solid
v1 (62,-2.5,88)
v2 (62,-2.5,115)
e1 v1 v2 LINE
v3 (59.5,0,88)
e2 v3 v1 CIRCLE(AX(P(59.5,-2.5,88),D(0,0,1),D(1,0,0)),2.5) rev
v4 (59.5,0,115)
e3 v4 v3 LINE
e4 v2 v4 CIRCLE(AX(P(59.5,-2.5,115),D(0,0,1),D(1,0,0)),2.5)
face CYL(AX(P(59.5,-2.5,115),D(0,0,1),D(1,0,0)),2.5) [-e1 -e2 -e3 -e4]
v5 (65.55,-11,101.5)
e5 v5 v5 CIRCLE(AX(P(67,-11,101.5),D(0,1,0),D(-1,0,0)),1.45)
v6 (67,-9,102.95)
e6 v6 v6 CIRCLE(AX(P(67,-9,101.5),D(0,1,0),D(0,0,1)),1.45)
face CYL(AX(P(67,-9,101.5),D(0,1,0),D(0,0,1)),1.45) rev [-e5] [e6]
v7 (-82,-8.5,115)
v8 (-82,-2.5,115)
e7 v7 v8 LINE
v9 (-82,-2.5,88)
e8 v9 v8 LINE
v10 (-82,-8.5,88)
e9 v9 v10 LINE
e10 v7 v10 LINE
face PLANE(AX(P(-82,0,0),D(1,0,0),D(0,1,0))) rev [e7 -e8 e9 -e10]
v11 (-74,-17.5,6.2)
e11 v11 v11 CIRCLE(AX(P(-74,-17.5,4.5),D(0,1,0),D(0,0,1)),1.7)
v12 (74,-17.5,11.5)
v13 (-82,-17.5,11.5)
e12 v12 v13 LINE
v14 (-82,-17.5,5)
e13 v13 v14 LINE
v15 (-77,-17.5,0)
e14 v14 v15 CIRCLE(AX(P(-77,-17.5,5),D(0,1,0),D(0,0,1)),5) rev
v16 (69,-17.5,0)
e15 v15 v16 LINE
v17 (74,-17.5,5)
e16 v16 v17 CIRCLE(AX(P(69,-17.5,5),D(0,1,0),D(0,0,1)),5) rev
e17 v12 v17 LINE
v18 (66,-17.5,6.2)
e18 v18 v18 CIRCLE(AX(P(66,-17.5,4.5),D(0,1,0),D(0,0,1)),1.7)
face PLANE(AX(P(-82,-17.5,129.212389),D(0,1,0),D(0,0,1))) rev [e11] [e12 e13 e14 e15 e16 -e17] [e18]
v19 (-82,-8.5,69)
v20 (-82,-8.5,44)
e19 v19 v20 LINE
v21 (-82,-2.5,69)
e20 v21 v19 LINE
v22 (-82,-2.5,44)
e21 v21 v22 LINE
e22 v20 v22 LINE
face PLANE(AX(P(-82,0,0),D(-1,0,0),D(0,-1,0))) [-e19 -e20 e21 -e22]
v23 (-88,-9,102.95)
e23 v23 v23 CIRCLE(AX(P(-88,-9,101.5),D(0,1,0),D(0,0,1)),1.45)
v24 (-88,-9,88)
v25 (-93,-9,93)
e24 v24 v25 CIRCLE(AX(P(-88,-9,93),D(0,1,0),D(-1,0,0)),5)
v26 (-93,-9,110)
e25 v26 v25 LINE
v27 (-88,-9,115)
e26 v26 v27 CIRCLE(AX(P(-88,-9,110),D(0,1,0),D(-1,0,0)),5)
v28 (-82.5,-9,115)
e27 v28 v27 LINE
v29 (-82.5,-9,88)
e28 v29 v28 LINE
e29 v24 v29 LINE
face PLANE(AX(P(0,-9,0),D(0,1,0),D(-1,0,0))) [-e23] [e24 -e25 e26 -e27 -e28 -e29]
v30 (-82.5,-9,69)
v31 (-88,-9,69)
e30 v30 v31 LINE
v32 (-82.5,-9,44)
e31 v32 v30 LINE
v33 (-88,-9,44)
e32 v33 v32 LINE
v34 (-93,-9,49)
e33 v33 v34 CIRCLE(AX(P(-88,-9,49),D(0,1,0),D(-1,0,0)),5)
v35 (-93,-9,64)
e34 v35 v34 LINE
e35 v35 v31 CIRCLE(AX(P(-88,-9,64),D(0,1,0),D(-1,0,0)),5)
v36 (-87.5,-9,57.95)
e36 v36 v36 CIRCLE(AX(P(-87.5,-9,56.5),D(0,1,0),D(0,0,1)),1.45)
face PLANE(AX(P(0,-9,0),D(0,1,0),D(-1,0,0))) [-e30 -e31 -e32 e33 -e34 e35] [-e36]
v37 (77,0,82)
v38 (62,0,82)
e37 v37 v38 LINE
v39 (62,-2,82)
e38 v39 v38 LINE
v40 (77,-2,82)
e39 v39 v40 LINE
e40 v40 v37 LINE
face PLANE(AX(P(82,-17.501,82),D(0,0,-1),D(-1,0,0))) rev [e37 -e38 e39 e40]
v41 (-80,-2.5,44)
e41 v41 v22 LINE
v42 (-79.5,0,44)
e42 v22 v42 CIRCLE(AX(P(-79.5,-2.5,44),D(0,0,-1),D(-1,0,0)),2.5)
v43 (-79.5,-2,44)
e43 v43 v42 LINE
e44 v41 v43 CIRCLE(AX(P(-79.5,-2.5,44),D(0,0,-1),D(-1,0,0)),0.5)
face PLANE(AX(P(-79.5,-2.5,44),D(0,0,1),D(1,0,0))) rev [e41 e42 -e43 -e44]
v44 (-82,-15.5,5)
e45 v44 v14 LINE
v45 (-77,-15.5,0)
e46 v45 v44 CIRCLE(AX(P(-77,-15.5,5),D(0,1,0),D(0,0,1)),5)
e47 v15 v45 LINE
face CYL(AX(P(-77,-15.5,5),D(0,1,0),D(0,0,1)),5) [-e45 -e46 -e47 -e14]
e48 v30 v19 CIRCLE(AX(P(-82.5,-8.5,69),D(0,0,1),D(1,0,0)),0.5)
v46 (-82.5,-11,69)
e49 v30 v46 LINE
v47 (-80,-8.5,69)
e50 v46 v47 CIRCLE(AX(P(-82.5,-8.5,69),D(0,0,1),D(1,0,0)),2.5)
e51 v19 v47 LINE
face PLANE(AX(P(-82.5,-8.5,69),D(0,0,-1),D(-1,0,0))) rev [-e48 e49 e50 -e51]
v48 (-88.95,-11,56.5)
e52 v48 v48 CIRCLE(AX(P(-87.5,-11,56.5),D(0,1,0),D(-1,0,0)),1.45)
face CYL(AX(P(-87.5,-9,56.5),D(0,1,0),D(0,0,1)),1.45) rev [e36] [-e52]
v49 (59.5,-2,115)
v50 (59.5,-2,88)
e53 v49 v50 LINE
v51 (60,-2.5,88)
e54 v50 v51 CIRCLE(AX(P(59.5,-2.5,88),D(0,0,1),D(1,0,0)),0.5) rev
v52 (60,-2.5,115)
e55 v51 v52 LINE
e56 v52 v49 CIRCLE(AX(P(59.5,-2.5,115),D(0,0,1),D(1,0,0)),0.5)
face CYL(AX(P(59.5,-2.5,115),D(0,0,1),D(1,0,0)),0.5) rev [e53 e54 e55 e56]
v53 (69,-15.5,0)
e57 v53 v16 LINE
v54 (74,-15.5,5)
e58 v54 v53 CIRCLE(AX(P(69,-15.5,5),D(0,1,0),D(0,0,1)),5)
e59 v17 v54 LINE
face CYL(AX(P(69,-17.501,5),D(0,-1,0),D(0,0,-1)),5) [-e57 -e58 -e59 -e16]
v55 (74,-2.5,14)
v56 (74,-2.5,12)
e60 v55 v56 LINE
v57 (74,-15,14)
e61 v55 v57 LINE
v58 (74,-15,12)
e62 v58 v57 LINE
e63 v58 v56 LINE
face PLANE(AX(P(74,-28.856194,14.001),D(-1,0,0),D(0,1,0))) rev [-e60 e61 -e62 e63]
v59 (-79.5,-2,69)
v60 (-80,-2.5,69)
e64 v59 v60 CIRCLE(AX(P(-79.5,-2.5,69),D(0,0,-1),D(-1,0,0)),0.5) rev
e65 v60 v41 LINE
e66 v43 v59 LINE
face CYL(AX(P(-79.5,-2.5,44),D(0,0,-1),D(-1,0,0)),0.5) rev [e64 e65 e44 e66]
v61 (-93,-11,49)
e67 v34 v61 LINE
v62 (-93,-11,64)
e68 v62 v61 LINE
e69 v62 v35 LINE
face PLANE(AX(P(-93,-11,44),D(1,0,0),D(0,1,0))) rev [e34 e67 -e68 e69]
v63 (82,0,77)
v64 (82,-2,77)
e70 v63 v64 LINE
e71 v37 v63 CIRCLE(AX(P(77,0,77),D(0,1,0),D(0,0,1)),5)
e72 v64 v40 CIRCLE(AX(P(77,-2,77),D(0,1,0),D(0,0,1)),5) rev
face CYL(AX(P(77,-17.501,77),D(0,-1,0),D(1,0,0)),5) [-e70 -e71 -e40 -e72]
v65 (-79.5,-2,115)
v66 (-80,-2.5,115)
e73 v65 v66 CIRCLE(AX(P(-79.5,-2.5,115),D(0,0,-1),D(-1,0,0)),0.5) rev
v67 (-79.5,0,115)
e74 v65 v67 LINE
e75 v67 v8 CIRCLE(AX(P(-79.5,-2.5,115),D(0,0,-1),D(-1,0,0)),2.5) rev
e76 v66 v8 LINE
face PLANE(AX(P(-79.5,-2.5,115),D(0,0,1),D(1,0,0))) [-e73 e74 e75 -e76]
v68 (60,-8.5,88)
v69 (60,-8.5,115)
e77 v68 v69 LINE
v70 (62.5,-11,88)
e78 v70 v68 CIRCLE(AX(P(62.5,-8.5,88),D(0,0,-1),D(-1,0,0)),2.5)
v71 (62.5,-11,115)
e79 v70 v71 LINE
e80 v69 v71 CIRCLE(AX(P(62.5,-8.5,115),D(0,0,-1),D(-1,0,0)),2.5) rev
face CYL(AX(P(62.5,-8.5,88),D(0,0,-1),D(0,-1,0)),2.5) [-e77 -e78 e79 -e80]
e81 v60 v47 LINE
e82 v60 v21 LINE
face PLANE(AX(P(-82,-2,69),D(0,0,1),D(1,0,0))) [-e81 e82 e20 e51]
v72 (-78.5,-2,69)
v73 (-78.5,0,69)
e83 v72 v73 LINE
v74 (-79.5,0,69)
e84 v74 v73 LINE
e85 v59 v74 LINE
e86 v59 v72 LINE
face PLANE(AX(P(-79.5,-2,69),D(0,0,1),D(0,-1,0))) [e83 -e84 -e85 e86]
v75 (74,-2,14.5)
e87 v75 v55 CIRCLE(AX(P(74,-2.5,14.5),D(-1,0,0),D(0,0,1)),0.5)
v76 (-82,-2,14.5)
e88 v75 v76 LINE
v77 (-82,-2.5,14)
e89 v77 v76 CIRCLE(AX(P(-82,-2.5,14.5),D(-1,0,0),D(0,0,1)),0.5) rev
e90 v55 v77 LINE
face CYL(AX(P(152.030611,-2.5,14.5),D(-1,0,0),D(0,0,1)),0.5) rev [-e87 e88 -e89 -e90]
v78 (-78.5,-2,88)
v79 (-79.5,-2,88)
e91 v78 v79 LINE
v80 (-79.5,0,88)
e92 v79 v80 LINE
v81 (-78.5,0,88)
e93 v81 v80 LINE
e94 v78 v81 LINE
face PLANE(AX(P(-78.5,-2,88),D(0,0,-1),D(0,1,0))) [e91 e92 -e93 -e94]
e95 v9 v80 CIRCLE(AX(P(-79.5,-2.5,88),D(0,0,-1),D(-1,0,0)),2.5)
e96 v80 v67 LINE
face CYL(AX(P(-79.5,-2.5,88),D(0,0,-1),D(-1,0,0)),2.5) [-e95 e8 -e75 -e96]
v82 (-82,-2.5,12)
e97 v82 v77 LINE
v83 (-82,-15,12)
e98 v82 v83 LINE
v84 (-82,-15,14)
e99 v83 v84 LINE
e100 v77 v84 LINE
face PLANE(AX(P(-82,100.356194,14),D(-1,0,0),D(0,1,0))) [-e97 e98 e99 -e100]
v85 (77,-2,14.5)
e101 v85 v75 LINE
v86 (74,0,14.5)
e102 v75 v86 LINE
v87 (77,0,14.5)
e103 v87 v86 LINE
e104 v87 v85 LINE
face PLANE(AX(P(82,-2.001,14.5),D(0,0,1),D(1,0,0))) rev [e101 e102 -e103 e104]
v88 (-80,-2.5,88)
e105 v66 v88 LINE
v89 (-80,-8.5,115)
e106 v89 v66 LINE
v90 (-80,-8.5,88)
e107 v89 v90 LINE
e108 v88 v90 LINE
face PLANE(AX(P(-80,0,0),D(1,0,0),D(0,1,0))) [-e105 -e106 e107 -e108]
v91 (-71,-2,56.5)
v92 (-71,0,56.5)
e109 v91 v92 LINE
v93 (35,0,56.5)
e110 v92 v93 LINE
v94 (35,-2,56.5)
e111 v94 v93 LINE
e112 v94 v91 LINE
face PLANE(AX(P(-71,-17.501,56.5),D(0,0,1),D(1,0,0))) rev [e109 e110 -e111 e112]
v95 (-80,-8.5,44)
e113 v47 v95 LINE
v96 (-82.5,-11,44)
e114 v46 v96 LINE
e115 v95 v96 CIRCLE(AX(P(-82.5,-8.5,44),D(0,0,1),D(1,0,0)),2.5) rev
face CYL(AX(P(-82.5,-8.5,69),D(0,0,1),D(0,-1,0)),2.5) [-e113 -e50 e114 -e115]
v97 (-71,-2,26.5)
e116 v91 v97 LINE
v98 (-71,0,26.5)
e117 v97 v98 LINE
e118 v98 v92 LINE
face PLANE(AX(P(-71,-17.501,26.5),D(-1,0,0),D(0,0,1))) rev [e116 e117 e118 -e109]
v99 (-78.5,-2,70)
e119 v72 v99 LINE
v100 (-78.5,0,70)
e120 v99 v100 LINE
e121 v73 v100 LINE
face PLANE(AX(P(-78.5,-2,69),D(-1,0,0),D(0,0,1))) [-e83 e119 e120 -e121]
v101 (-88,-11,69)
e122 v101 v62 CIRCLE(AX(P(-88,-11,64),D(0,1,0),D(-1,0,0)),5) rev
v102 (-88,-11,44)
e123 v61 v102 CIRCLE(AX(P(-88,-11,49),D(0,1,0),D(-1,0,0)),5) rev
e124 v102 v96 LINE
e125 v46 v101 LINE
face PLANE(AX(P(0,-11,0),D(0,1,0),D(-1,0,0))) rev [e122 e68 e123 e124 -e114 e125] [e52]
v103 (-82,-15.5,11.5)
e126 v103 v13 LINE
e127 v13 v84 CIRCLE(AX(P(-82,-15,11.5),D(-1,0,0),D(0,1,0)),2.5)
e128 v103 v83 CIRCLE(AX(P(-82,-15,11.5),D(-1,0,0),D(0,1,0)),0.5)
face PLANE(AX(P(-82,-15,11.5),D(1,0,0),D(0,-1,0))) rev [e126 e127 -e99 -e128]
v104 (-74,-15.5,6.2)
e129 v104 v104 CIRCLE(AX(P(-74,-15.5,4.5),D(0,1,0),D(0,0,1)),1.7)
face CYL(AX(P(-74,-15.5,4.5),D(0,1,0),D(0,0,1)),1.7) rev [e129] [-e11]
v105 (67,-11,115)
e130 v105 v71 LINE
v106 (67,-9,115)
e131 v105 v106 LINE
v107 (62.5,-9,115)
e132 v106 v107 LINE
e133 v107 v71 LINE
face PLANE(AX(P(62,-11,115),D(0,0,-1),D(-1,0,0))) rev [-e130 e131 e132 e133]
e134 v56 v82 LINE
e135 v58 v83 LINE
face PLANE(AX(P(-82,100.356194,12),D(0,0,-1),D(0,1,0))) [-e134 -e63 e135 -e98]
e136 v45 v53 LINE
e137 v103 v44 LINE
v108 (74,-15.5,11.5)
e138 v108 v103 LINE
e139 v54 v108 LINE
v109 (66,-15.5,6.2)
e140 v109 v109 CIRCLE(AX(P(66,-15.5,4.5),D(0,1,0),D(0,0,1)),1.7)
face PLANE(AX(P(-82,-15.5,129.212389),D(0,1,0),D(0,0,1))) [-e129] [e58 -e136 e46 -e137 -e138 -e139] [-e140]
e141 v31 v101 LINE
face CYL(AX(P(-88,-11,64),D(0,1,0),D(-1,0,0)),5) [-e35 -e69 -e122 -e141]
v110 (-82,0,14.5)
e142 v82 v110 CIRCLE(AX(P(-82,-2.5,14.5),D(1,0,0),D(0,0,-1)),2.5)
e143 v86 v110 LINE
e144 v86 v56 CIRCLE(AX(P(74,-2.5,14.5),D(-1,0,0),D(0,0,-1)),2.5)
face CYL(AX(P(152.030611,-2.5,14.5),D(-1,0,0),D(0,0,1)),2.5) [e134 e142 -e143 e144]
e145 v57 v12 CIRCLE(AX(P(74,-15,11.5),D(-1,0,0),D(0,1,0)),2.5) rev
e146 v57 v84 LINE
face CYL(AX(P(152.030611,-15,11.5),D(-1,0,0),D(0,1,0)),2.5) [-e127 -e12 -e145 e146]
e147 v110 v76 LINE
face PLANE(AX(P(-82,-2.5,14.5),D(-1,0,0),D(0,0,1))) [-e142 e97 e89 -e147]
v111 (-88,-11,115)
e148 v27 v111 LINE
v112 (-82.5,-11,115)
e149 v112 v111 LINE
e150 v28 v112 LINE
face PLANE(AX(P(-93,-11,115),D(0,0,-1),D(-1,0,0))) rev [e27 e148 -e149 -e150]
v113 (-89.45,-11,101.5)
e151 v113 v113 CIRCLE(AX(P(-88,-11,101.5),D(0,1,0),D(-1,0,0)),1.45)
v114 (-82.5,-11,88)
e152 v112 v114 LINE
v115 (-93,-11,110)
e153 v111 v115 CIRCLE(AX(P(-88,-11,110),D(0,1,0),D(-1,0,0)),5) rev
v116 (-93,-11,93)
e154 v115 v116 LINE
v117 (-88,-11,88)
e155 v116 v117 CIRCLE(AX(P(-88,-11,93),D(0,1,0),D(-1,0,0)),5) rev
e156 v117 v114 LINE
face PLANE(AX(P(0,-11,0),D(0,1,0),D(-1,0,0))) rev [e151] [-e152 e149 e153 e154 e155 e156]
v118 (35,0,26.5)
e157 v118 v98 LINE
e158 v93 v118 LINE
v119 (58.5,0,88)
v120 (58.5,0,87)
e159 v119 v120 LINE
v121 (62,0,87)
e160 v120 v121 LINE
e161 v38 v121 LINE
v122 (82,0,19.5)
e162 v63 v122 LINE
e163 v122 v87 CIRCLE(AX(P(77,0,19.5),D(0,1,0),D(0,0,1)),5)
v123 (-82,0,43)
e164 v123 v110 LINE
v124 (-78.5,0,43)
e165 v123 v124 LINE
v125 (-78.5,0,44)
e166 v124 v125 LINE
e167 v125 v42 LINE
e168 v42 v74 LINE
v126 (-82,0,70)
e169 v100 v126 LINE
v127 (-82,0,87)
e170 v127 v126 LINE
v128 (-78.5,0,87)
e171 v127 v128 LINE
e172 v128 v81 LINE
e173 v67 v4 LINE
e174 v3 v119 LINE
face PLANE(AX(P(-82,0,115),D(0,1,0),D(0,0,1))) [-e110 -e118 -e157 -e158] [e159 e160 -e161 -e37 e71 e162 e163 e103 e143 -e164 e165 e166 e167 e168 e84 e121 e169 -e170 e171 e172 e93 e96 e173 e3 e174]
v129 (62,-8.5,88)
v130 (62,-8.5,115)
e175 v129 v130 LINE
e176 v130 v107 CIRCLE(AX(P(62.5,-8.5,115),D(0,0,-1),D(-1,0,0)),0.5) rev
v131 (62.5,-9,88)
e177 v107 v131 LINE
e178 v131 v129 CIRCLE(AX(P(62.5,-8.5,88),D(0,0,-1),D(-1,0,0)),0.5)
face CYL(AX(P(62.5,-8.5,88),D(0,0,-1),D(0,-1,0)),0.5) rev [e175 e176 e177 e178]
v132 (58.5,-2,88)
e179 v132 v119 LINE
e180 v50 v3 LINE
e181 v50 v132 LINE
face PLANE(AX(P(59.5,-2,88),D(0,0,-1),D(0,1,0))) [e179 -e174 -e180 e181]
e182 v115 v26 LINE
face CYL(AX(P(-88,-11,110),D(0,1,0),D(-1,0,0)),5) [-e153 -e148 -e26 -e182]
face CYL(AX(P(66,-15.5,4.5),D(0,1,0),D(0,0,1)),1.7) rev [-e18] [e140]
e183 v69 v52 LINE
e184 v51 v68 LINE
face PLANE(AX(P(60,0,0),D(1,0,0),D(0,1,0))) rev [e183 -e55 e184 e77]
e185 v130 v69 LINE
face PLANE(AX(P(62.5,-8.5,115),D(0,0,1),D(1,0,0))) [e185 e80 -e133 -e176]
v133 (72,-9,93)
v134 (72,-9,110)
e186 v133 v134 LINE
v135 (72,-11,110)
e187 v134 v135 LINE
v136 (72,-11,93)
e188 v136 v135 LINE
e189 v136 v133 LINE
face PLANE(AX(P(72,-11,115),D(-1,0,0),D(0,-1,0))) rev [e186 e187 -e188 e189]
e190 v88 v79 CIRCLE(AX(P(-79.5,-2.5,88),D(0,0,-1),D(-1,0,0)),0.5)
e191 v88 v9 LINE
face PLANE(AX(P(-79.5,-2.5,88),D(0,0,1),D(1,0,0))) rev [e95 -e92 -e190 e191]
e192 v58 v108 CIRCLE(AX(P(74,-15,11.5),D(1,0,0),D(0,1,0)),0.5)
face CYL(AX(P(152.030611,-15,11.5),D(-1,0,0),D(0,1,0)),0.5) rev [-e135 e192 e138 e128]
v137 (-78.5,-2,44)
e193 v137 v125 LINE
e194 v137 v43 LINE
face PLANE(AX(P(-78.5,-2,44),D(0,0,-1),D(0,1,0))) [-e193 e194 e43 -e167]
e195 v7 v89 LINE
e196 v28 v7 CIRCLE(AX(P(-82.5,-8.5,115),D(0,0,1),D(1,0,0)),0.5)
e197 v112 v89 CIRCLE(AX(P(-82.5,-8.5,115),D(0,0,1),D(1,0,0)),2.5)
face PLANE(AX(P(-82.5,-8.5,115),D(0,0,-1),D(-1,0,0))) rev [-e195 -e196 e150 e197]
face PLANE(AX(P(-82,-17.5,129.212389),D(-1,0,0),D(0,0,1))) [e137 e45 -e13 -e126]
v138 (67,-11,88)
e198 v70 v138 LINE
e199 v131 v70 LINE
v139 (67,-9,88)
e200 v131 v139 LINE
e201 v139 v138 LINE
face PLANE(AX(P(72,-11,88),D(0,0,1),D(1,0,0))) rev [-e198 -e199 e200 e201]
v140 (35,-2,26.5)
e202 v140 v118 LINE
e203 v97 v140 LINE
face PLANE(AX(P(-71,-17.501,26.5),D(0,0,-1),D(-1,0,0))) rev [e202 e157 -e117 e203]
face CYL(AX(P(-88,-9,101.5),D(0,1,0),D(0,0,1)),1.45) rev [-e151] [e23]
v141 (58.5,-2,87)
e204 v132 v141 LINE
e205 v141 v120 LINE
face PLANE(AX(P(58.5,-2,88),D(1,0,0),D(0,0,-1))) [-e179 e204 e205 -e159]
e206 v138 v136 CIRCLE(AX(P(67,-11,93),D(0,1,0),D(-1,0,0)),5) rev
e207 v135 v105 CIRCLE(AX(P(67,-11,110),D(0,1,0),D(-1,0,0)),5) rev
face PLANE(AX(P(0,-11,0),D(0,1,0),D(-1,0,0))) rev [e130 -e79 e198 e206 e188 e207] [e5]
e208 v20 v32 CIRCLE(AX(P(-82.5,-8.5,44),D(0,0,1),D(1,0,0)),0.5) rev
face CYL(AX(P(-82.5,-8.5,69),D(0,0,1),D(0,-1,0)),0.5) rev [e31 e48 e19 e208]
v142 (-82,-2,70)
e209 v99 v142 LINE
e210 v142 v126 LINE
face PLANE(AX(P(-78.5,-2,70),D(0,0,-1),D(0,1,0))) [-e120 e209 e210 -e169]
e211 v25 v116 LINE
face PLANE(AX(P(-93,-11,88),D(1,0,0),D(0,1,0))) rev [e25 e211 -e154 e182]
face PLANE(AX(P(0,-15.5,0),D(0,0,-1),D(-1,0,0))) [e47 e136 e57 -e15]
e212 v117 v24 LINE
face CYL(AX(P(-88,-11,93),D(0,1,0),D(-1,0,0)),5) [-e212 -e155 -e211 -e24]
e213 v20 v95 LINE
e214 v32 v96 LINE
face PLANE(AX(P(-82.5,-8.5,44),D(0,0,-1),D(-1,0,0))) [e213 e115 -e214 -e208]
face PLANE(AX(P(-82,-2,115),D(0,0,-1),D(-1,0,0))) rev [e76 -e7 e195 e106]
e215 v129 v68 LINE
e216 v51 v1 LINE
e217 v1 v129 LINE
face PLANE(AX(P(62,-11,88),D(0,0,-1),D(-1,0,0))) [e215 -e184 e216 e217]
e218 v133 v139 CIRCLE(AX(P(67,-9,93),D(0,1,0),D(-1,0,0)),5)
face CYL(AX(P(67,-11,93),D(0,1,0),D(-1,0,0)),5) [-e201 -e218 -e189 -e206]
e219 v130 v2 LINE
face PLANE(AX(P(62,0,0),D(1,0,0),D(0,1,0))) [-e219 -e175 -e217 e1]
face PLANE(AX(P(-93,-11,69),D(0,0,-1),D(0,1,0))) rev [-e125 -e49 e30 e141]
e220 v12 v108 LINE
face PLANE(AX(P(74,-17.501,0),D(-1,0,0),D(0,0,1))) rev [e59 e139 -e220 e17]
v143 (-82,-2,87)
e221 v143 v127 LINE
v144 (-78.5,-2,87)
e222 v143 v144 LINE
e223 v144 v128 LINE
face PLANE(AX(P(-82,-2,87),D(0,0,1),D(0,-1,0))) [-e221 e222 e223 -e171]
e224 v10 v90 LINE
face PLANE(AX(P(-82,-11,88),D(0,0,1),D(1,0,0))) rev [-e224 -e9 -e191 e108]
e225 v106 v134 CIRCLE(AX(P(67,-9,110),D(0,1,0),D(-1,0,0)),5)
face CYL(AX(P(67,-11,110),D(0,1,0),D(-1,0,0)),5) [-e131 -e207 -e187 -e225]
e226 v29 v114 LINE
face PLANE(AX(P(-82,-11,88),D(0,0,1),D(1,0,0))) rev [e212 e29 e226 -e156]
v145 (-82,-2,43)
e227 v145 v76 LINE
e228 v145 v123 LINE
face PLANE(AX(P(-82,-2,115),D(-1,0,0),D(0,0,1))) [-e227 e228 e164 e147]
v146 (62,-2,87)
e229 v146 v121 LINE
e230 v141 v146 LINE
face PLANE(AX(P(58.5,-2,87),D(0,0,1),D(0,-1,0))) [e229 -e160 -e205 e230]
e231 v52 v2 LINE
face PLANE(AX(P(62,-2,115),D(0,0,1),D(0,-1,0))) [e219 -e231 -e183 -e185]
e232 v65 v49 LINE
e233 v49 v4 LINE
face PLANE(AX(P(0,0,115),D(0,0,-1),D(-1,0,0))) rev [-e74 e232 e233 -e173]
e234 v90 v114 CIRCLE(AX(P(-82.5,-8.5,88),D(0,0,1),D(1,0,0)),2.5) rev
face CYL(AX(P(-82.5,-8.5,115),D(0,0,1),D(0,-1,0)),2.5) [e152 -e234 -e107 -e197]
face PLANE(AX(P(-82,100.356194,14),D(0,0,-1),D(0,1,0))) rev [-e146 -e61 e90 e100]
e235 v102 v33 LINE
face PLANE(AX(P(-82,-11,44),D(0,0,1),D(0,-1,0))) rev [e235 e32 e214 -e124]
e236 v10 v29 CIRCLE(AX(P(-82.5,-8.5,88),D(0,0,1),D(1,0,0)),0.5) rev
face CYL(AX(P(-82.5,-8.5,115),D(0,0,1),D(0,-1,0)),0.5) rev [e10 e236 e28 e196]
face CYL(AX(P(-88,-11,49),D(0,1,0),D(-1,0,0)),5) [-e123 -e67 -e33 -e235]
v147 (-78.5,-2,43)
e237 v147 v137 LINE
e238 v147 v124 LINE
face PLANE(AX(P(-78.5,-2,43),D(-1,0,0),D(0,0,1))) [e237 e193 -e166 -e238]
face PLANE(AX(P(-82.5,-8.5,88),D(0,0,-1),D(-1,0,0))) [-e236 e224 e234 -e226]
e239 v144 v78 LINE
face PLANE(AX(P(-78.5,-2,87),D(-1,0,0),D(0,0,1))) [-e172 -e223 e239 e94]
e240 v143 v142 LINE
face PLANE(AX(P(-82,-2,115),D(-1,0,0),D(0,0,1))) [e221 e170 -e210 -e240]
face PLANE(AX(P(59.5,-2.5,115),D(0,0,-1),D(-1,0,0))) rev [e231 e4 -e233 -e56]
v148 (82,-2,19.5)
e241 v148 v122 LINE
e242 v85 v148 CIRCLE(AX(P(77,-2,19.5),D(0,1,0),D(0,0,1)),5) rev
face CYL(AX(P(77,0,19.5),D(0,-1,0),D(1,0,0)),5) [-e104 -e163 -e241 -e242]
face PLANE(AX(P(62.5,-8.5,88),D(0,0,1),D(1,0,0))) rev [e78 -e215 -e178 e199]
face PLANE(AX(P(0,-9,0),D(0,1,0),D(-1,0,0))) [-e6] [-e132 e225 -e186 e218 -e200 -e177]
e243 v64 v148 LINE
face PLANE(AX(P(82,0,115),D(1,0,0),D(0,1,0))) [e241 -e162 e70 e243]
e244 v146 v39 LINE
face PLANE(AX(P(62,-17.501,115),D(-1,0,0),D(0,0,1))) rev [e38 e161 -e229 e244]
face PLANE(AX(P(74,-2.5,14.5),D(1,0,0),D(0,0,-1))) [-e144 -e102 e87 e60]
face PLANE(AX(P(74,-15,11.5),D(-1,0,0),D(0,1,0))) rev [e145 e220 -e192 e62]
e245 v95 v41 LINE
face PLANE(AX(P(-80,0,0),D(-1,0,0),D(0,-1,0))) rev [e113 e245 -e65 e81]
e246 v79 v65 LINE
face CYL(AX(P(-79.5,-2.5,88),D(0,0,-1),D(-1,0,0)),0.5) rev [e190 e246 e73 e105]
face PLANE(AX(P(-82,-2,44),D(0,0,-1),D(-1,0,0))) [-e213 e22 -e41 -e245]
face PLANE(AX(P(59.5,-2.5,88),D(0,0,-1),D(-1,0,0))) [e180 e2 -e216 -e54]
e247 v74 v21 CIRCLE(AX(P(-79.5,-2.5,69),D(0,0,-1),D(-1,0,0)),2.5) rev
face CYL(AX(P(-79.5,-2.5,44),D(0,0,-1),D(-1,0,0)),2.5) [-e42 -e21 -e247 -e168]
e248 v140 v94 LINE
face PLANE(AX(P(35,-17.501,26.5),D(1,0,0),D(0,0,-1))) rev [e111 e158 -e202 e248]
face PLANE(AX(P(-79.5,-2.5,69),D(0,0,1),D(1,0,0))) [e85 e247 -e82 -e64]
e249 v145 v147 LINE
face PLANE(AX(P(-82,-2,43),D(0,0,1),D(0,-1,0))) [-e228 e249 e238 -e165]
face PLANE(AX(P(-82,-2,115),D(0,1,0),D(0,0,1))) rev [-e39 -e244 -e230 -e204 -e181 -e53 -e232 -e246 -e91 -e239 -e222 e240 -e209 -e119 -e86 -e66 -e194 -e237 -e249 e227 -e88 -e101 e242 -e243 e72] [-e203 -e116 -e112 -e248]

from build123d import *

# Parameters (mm, degrees)
SKETCH_2_W                        = 164
SKETCH_2_H                        = 2
SM_BASE_FLANGE_1_DEPTH            = 115
OTHER_START                       = -82
OTHER_1_DEPTH                     = 164
OTHER_1_2_DEPTH                   = 164
OTHER_1_3_DEPTH                   = 164
OTHER_1_3_2_DEPTH                 = 164
CUT_EXTRUDE_2_REACH               = 143.255
SKETCH_10_W                       = 8
SKETCH_10_H                       = 28.71238898
OTHER_1_4_DEPTH                   = 156
OTHER_1_4_2_DEPTH                 = 156
CUT_EXTRUDE_5_REACH               = 144.321
SKETCH_17_W                       = 20
SKETCH_17_H                       = 33
SM_EDGE_FLANGE_2_STRIP_W          = 9
SM_EDGE_FLANGE_2_STRIP_H          = 2
SM_EDGE_FLANGE_2_STRIP_CUT_DEPTH  = 27
SM_EDGE_FLANGE_2_RELIEF_W         = 10
SM_EDGE_FLANGE_2_RELIEF_H         = 1
SM_EDGE_FLANGE_2_RELIEF_CUT_DEPTH = 2
SM_EDGE_FLANGE_2_DEPTH            = 27
SM_EDGE_FLANGE_4_STRIP_W          = 9
SM_EDGE_FLANGE_4_STRIP_H          = 2
SM_EDGE_FLANGE_4_STRIP_CUT_DEPTH  = 27
SM_EDGE_FLANGE_4_DEPTH            = 27
SM_EDGE_FLANGE_6_STRIP_W          = 9
SM_EDGE_FLANGE_6_STRIP_H          = 2
SM_EDGE_FLANGE_6_STRIP_CUT_DEPTH  = 25
SM_EDGE_FLANGE_6_RELIEF_W         = 10
SM_EDGE_FLANGE_6_RELIEF_H         = 1
SM_EDGE_FLANGE_6_RELIEF_CUT_DEPTH = 2
SM_EDGE_FLANGE_6_DEPTH            = 25
SM_EDGE_FLANGE_8_STRIP_W          = 9
SM_EDGE_FLANGE_8_STRIP_H          = 2
SM_EDGE_FLANGE_8_STRIP_CUT_DEPTH  = 25
SM_EDGE_FLANGE_8_DEPTH            = 25
SM_EDGE_FLANGE_9_STRIP_W          = 9
SM_EDGE_FLANGE_9_STRIP_H          = 2
SM_EDGE_FLANGE_9_STRIP_CUT_DEPTH  = 27
SM_EDGE_FLANGE_9_RELIEF_W         = 10
SM_EDGE_FLANGE_9_RELIEF_H         = 1
SM_EDGE_FLANGE_9_RELIEF_CUT_DEPTH = 2
SM_EDGE_FLANGE_9_DEPTH            = 27
SM_EDGE_FLANGE_10_STRIP_W         = 9
SM_EDGE_FLANGE_10_STRIP_H         = 2
SM_EDGE_FLANGE_10_STRIP_CUT_DEPTH = 27
SM_EDGE_FLANGE_10_DEPTH           = 27
CUT_EXTRUDE_6_REACH               = 150.93
SKETCH_45_W                       = 106
SKETCH_45_H                       = 30
FILLET_1_R                        = 5
HOLE_WIZARD_M3_1_D                = 3.4
HOLE_WIZARD_M2_5_1_D              = 2.9


# Read off the part's stored shape, not the designer's step: ｼﾞｮｸﾞ1, ｱﾝﾌｫｰﾙﾄﾞ1, ﾌｫｰﾙﾄﾞ1
# Sheet-metal steps are written as plain solids
with BuildPart() as part:
    # Sketch 2 → ﾍﾞｰｽ-ﾌﾗﾝｼﾞ1 (new body)
    with BuildSketch(Plane.XY):
        with Locations((0, -1)):
            Rectangle(SKETCH_2_W, SKETCH_2_H)
    extrude(amount=SM_BASE_FLANGE_1_DEPTH)

    # Other 1 outline → Other 1 (cut)
    with BuildSketch(Plane.YZ.offset(OTHER_START)):
        with BuildLine():
            ThreePointArc((0, 14.5), (-0.563508327, 12.91886117), (-2, 12.050510257))
            Line((-2, 12.050510257), (-2, 0))
            Line((-2, 0), (0, 0))
            Line((0, 0), (0, 14.5))
        make_face()
    extrude(amount=OTHER_1_DEPTH, mode=Mode.SUBTRACT)

    # Other 1 2 outline → Other 1 2 (add)
    with BuildSketch(Plane.YZ.offset(OTHER_START)):
        with BuildLine():
            ThreePointArc((-15.5, 11.5), (-15.353553391, 11.853553391), (-15, 12))
            Line((-15, 12), (-2.5, 12))
            ThreePointArc((-2.5, 12), (-2.248727595, 12.012659617), (-2, 12.050510257))
            Line((-2, 12.050510257), (-2, 14.5))
            ThreePointArc((-2, 14.5), (-2.146446609, 14.146446609), (-2.5, 14))
            Line((-2.5, 14), (-15, 14))
            ThreePointArc((-15, 14), (-16.767766953, 13.267766953), (-17.5, 11.5))
            Line((-17.5, 11.5), (-17.5, 0))
            Line((-17.5, 0), (-15.5, 0))
            Line((-15.5, 0), (-15.5, 11.5))
        make_face()
    extrude(amount=OTHER_1_2_DEPTH)

    # Other 1 3 outline → Other 1 3 (cut)
    with BuildSketch(Plane.YZ.offset(OTHER_START)):
        with BuildLine():
            ThreePointArc((-2.5, 12), (-2.248727595, 12.012659617), (-2, 12.050510257))
            Line((-2, 12.050510257), (-2, 14.5))
            ThreePointArc((-2, 14.5), (-2.146446609, 14.146446609), (-2.5, 14))
            Line((-2.5, 14), (-15, 14))
            ThreePointArc((-15, 14), (-16.767766953, 13.267766953), (-17.5, 11.5))
            Line((-17.5, 11.5), (-17.5, 0))
            Line((-17.5, 0), (-15.5, 0))
            Line((-15.5, 0), (-15.5, 11.5))
            ThreePointArc((-15.5, 11.5), (-15.353553391, 11.853553391), (-15, 12))
            Line((-15, 12), (-2.5, 12))
        make_face()
    extrude(amount=OTHER_1_3_DEPTH, mode=Mode.SUBTRACT)

    # Other 1 3 2 outline → Other 1 3 2 (add)
    with BuildSketch(Plane.YZ.offset(OTHER_START)):
        with BuildLine():
            Line((0, -14.21238898), (0, 14.5))
            ThreePointArc((0, 14.5), (-0.563508327, 12.91886117), (-2, 12.050510257))
            Line((-2, 12.050510257), (-2, -14.21238898))
            Line((-2, -14.21238898), (0, -14.21238898))
        make_face()
    extrude(amount=OTHER_1_3_2_DEPTH)

    # ｽｹｯﾁ10 → ｶｯﾄ - 押し出し2 (cut, up to next)
    with BuildSketch(Plane(origin=(0, 0, 0), x_dir=(1, 0, 0), z_dir=(0, 1, 0)), mode=Mode.PRIVATE) as cut_extrude_2_sk1:
        with Locations((78, -0.14380551)):
            Rectangle(SKETCH_10_W, SKETCH_10_H)
    cut_extrude_2_tool1 = extrude(cut_extrude_2_sk1.sketch, amount=-CUT_EXTRUDE_2_REACH, mode=Mode.PRIVATE) & part.part
    add(cut_extrude_2_tool1.solids().sort_by_distance((78, 0, 0.143806))[0], mode=Mode.SUBTRACT)

    # Other 1 4 outline → Other 1 4 (cut)
    with BuildSketch(Plane.YZ.offset(OTHER_START)):
        with BuildLine():
            ThreePointArc((0, 14.5), (-0.563508327, 12.91886117), (-2, 12.050510257))
            Line((-2, 12.050510257), (-2, -14.21238898))
            Line((-2, -14.21238898), (0, -14.21238898))
            Line((0, -14.21238898), (0, 14.5))
        make_face()
    extrude(amount=OTHER_1_4_DEPTH, mode=Mode.SUBTRACT)

    # Other 1 4 2 outline → Other 1 4 2 (add)
    with BuildSketch(Plane.YZ.offset(OTHER_START)):
        with BuildLine():
            ThreePointArc((-15.5, 11.5), (-15.353553391, 11.853553391), (-15, 12))
            Line((-15, 12), (-2.5, 12))
            ThreePointArc((-2.5, 12), (-2.248727595, 12.012659617), (-2, 12.050510257))
            Line((-2, 12.050510257), (-2, 14.5))
            ThreePointArc((-2, 14.5), (-2.146446609, 14.146446609), (-2.5, 14))
            Line((-2.5, 14), (-15, 14))
            ThreePointArc((-15, 14), (-16.767766953, 13.267766953), (-17.5, 11.5))
            Line((-17.5, 11.5), (-17.5, 0))
            Line((-17.5, 0), (-15.5, 0))
            Line((-15.5, 0), (-15.5, 11.5))
        make_face()
    extrude(amount=OTHER_1_4_2_DEPTH)

    # ｽｹｯﾁ17 → ｶｯﾄ - 押し出し5 (cut, up to next)
    with BuildSketch(Plane(origin=(0, 0, 0), x_dir=(1, 0, 0), z_dir=(0, 1, 0)), mode=Mode.PRIVATE) as cut_extrude_5_sk1:
        with Locations((72, -98.5)):
            Rectangle(SKETCH_17_W, SKETCH_17_H)
    cut_extrude_5_tool1 = extrude(cut_extrude_5_sk1.sketch, amount=-CUT_EXTRUDE_5_REACH, mode=Mode.PRIVATE) & part.part
    add(cut_extrude_5_tool1.solids().sort_by_distance((72, 0, 98.5))[0], mode=Mode.SUBTRACT)

    # ｴｯｼﾞ-ﾌﾗﾝｼﾞ2 strip (across the edge) → ｴｯｼﾞ-ﾌﾗﾝｼﾞ2 strip cut (cut)
    with BuildSketch(Plane(origin=(62, -2, 88), x_dir=(-1, 0, 0), z_dir=(0, 0, 1))):
        with Locations((-2, -1)):
            Rectangle(SM_EDGE_FLANGE_2_STRIP_W, SM_EDGE_FLANGE_2_STRIP_H)
    extrude(amount=SM_EDGE_FLANGE_2_STRIP_CUT_DEPTH, mode=Mode.SUBTRACT)

    # ｴｯｼﾞ-ﾌﾗﾝｼﾞ2 relief (on the sheet) → ｴｯｼﾞ-ﾌﾗﾝｼﾞ2 relief cut (cut)
    with BuildSketch(Plane(origin=(59.5, -2, 88), x_dir=(-1, 0, 0), z_dir=(0, -1, 0))):
        with Locations((-4, 0.5)):
            Rectangle(SM_EDGE_FLANGE_2_RELIEF_W, SM_EDGE_FLANGE_2_RELIEF_H)
    extrude(amount=-SM_EDGE_FLANGE_2_RELIEF_CUT_DEPTH, mode=Mode.SUBTRACT)

    # ｴｯｼﾞ-ﾌﾗﾝｼﾞ2 section (across the edge) → ｴｯｼﾞ-ﾌﾗﾝｼﾞ2 (add)
    with BuildSketch(Plane(origin=(62, -2, 88), x_dir=(-1, 0, 0), z_dir=(0, 0, 1))):
        with BuildLine():
            Line((0, 0.5), (0, 9))
            Line((0, 9), (2, 9))
            Line((2, 9), (2, 0.5))
            ThreePointArc((2, 0.5), (2.146446609, 0.146446609), (2.5, 0))
            Line((2.5, 0), (2.5, -2))
            ThreePointArc((2.5, -2), (0.732233047, -1.267766953), (0, 0.5))
        make_face()
    extrude(amount=SM_EDGE_FLANGE_2_DEPTH)

    # ｴｯｼﾞ-ﾌﾗﾝｼﾞ4 strip (across the edge) → ｴｯｼﾞ-ﾌﾗﾝｼﾞ4 strip cut (cut)
    with BuildSketch(Plane(origin=(62, -11, 115), x_dir=(0, 1, 0), z_dir=(0, 0, -1))):
        with Locations((-2, -1)):
            Rectangle(SM_EDGE_FLANGE_4_STRIP_W, SM_EDGE_FLANGE_4_STRIP_H)
    extrude(amount=SM_EDGE_FLANGE_4_STRIP_CUT_DEPTH, mode=Mode.SUBTRACT)

    # ｴｯｼﾞ-ﾌﾗﾝｼﾞ4 section (across the edge) → ｴｯｼﾞ-ﾌﾗﾝｼﾞ4 (add)
    with BuildSketch(Plane(origin=(62, -11, 115), x_dir=(0, 1, 0), z_dir=(0, 0, -1))):
        with BuildLine():
            Line((0, 0.5), (0, 10))
            Line((0, 10), (2, 10))
            Line((2, 10), (2, 0.5))
            ThreePointArc((2, 0.5), (2.146446609, 0.146446609), (2.5, 0))
            Line((2.5, 0), (2.5, -2))
            ThreePointArc((2.5, -2), (0.732233047, -1.267766953), (0, 0.5))
        make_face()
    extrude(amount=SM_EDGE_FLANGE_4_DEPTH)

    # ｴｯｼﾞ-ﾌﾗﾝｼﾞ6 strip (across the edge) → ｴｯｼﾞ-ﾌﾗﾝｼﾞ6 strip cut (cut)
    with BuildSketch(Plane(origin=(-82, -2, 69), x_dir=(1, 0, 0), z_dir=(0, 0, -1))):
        with Locations((-2, -1)):
            Rectangle(SM_EDGE_FLANGE_6_STRIP_W, SM_EDGE_FLANGE_6_STRIP_H)
    extrude(amount=SM_EDGE_FLANGE_6_STRIP_CUT_DEPTH, mode=Mode.SUBTRACT)

    # ｴｯｼﾞ-ﾌﾗﾝｼﾞ6 relief (on the sheet) → ｴｯｼﾞ-ﾌﾗﾝｼﾞ6 relief cut (cut)
    with BuildSketch(Plane(origin=(-79.5, -2, 69), x_dir=(1, 0, 0), z_dir=(0, -1, 0))):
        with Locations((-4, 0.5)):
            Rectangle(SM_EDGE_FLANGE_6_RELIEF_W, SM_EDGE_FLANGE_6_RELIEF_H)
        with Locations((-4, -25.5)):
            Rectangle(SM_EDGE_FLANGE_6_RELIEF_W, SM_EDGE_FLANGE_6_RELIEF_H)
    extrude(amount=-SM_EDGE_FLANGE_6_RELIEF_CUT_DEPTH, mode=Mode.SUBTRACT)

    # ｴｯｼﾞ-ﾌﾗﾝｼﾞ6 section (across the edge) → ｴｯｼﾞ-ﾌﾗﾝｼﾞ6 (add)
    with BuildSketch(Plane(origin=(-82, -2, 69), x_dir=(1, 0, 0), z_dir=(0, 0, -1))):
        with BuildLine():
            Line((0, 0.5), (0, 9))
            Line((0, 9), (2, 9))
            Line((2, 9), (2, 0.5))
            ThreePointArc((2, 0.5), (2.146446609, 0.146446609), (2.5, 0))
            Line((2.5, 0), (2.5, -2))
            ThreePointArc((2.5, -2), (0.732233047, -1.267766953), (0, 0.5))
        make_face()
    extrude(amount=SM_EDGE_FLANGE_6_DEPTH)

    # ｴｯｼﾞ-ﾌﾗﾝｼﾞ8 strip (across the edge) → ｴｯｼﾞ-ﾌﾗﾝｼﾞ8 strip cut (cut)
    with BuildSketch(Plane(origin=(-82, -11, 44), x_dir=(0, 1, 0), z_dir=(0, 0, 1))):
        with Locations((-2, -1)):
            Rectangle(SM_EDGE_FLANGE_8_STRIP_W, SM_EDGE_FLANGE_8_STRIP_H)
    extrude(amount=SM_EDGE_FLANGE_8_STRIP_CUT_DEPTH, mode=Mode.SUBTRACT)

    # ｴｯｼﾞ-ﾌﾗﾝｼﾞ8 section (across the edge) → ｴｯｼﾞ-ﾌﾗﾝｼﾞ8 (add)
    with BuildSketch(Plane(origin=(-82, -11, 44), x_dir=(0, 1, 0), z_dir=(0, 0, 1))):
        with BuildLine():
            Line((0, 0.5), (0, 11))
            Line((0, 11), (2, 11))
            Line((2, 11), (2, 0.5))
            ThreePointArc((2, 0.5), (2.146446609, 0.146446609), (2.5, 0))
            Line((2.5, 0), (2.5, -2))
            ThreePointArc((2.5, -2), (0.732233047, -1.267766953), (0, 0.5))
        make_face()
    extrude(amount=SM_EDGE_FLANGE_8_DEPTH)

    # ｴｯｼﾞ-ﾌﾗﾝｼﾞ9 strip (across the edge) → ｴｯｼﾞ-ﾌﾗﾝｼﾞ9 strip cut (cut)
    with BuildSketch(Plane(origin=(-82, -2, 115), x_dir=(1, 0, 0), z_dir=(0, 0, -1))):
        with Locations((-2, -1)):
            Rectangle(SM_EDGE_FLANGE_9_STRIP_W, SM_EDGE_FLANGE_9_STRIP_H)
    extrude(amount=SM_EDGE_FLANGE_9_STRIP_CUT_DEPTH, mode=Mode.SUBTRACT)

    # ｴｯｼﾞ-ﾌﾗﾝｼﾞ9 relief (on the sheet) → ｴｯｼﾞ-ﾌﾗﾝｼﾞ9 relief cut (cut)
    with BuildSketch(Plane(origin=(-79.5, -2, 115), x_dir=(1, 0, 0), z_dir=(0, -1, 0))):
        with Locations((-4, -27.5)):
            Rectangle(SM_EDGE_FLANGE_9_RELIEF_W, SM_EDGE_FLANGE_9_RELIEF_H)
    extrude(amount=-SM_EDGE_FLANGE_9_RELIEF_CUT_DEPTH, mode=Mode.SUBTRACT)

    # ｴｯｼﾞ-ﾌﾗﾝｼﾞ9 section (across the edge) → ｴｯｼﾞ-ﾌﾗﾝｼﾞ9 (add)
    with BuildSketch(Plane(origin=(-82, -2, 115), x_dir=(1, 0, 0), z_dir=(0, 0, -1))):
        with BuildLine():
            Line((0, 0.5), (0, 9))
            Line((0, 9), (2, 9))
            Line((2, 9), (2, 0.5))
            ThreePointArc((2, 0.5), (2.146446609, 0.146446609), (2.5, 0))
            Line((2.5, 0), (2.5, -2))
            ThreePointArc((2.5, -2), (0.732233047, -1.267766953), (0, 0.5))
        make_face()
    extrude(amount=SM_EDGE_FLANGE_9_DEPTH)

    # ｴｯｼﾞ-ﾌﾗﾝｼﾞ10 strip (across the edge) → ｴｯｼﾞ-ﾌﾗﾝｼﾞ10 strip cut (cut)
    with BuildSketch(Plane(origin=(-82, -11, 88), x_dir=(0, 1, 0), z_dir=(0, 0, 1))):
        with Locations((-2, -1)):
            Rectangle(SM_EDGE_FLANGE_10_STRIP_W, SM_EDGE_FLANGE_10_STRIP_H)
    extrude(amount=SM_EDGE_FLANGE_10_STRIP_CUT_DEPTH, mode=Mode.SUBTRACT)

    # ｴｯｼﾞ-ﾌﾗﾝｼﾞ10 section (across the edge) → ｴｯｼﾞ-ﾌﾗﾝｼﾞ10 (add)
    with BuildSketch(Plane(origin=(-82, -11, 88), x_dir=(0, 1, 0), z_dir=(0, 0, 1))):
        with BuildLine():
            Line((0, 0.5), (0, 11))
            Line((0, 11), (2, 11))
            Line((2, 11), (2, 0.5))
            ThreePointArc((2, 0.5), (2.146446609, 0.146446609), (2.5, 0))
            Line((2.5, 0), (2.5, -2))
            ThreePointArc((2.5, -2), (0.732233047, -1.267766953), (0, 0.5))
        make_face()
    extrude(amount=SM_EDGE_FLANGE_10_DEPTH)

    # ｽｹｯﾁ45 → ｶｯﾄ - 押し出し6 (cut, up to next)
    with BuildSketch(Plane(origin=(0, 0, 0), x_dir=(1, 0, 0), z_dir=(0, 1, 0)), mode=Mode.PRIVATE) as cut_extrude_6_sk1:
        with Locations((-18, -41.5)):
            Rectangle(SKETCH_45_W, SKETCH_45_H)
    cut_extrude_6_tool1 = extrude(cut_extrude_6_sk1.sketch, amount=-CUT_EXTRUDE_6_REACH, mode=Mode.PRIVATE) & part.part
    add(cut_extrude_6_tool1.solids().sort_by_distance((-18, 0, 41.5))[0], mode=Mode.SUBTRACT)

    # ﾌｨﾚｯﾄ1
    fillet_1_edges = [part.edges().sort_by_distance(p)[0] for p in [
        (-82, -16.5, 0),
        (74, -16.5, 0),
        (82, -1, 14.5),
        (82, -1, 82),
        (72, -10, 115),
        (72, -10, 88),
        (-93, -10, 44),
        (-93, -10, 69),
        (-93, -10, 88),
        (-93, -10, 115),
    ]]
    fillet(fillet_1_edges, radius=FILLET_1_R)

    # M3 すきま穴1 (through all)
    with Locations(Plane(origin=(0, -15.5, 0), x_dir=(1, 0, 0), z_dir=(0, 1, 0))):
        with Locations((66, -4.5), (-74, -4.5)):
            Hole(HOLE_WIZARD_M3_1_D / 2)

    # M2.5 すきま穴1 (through all)
    with Locations(Plane(origin=(0, -9, 0), x_dir=(1, 0, 0), z_dir=(0, 1, 0))):
        with Locations((-88, -101.5), (67, -101.5), (-87.5, -56.5)):
            Hole(HOLE_WIZARD_M2_5_1_D / 2)


solid = part.part
